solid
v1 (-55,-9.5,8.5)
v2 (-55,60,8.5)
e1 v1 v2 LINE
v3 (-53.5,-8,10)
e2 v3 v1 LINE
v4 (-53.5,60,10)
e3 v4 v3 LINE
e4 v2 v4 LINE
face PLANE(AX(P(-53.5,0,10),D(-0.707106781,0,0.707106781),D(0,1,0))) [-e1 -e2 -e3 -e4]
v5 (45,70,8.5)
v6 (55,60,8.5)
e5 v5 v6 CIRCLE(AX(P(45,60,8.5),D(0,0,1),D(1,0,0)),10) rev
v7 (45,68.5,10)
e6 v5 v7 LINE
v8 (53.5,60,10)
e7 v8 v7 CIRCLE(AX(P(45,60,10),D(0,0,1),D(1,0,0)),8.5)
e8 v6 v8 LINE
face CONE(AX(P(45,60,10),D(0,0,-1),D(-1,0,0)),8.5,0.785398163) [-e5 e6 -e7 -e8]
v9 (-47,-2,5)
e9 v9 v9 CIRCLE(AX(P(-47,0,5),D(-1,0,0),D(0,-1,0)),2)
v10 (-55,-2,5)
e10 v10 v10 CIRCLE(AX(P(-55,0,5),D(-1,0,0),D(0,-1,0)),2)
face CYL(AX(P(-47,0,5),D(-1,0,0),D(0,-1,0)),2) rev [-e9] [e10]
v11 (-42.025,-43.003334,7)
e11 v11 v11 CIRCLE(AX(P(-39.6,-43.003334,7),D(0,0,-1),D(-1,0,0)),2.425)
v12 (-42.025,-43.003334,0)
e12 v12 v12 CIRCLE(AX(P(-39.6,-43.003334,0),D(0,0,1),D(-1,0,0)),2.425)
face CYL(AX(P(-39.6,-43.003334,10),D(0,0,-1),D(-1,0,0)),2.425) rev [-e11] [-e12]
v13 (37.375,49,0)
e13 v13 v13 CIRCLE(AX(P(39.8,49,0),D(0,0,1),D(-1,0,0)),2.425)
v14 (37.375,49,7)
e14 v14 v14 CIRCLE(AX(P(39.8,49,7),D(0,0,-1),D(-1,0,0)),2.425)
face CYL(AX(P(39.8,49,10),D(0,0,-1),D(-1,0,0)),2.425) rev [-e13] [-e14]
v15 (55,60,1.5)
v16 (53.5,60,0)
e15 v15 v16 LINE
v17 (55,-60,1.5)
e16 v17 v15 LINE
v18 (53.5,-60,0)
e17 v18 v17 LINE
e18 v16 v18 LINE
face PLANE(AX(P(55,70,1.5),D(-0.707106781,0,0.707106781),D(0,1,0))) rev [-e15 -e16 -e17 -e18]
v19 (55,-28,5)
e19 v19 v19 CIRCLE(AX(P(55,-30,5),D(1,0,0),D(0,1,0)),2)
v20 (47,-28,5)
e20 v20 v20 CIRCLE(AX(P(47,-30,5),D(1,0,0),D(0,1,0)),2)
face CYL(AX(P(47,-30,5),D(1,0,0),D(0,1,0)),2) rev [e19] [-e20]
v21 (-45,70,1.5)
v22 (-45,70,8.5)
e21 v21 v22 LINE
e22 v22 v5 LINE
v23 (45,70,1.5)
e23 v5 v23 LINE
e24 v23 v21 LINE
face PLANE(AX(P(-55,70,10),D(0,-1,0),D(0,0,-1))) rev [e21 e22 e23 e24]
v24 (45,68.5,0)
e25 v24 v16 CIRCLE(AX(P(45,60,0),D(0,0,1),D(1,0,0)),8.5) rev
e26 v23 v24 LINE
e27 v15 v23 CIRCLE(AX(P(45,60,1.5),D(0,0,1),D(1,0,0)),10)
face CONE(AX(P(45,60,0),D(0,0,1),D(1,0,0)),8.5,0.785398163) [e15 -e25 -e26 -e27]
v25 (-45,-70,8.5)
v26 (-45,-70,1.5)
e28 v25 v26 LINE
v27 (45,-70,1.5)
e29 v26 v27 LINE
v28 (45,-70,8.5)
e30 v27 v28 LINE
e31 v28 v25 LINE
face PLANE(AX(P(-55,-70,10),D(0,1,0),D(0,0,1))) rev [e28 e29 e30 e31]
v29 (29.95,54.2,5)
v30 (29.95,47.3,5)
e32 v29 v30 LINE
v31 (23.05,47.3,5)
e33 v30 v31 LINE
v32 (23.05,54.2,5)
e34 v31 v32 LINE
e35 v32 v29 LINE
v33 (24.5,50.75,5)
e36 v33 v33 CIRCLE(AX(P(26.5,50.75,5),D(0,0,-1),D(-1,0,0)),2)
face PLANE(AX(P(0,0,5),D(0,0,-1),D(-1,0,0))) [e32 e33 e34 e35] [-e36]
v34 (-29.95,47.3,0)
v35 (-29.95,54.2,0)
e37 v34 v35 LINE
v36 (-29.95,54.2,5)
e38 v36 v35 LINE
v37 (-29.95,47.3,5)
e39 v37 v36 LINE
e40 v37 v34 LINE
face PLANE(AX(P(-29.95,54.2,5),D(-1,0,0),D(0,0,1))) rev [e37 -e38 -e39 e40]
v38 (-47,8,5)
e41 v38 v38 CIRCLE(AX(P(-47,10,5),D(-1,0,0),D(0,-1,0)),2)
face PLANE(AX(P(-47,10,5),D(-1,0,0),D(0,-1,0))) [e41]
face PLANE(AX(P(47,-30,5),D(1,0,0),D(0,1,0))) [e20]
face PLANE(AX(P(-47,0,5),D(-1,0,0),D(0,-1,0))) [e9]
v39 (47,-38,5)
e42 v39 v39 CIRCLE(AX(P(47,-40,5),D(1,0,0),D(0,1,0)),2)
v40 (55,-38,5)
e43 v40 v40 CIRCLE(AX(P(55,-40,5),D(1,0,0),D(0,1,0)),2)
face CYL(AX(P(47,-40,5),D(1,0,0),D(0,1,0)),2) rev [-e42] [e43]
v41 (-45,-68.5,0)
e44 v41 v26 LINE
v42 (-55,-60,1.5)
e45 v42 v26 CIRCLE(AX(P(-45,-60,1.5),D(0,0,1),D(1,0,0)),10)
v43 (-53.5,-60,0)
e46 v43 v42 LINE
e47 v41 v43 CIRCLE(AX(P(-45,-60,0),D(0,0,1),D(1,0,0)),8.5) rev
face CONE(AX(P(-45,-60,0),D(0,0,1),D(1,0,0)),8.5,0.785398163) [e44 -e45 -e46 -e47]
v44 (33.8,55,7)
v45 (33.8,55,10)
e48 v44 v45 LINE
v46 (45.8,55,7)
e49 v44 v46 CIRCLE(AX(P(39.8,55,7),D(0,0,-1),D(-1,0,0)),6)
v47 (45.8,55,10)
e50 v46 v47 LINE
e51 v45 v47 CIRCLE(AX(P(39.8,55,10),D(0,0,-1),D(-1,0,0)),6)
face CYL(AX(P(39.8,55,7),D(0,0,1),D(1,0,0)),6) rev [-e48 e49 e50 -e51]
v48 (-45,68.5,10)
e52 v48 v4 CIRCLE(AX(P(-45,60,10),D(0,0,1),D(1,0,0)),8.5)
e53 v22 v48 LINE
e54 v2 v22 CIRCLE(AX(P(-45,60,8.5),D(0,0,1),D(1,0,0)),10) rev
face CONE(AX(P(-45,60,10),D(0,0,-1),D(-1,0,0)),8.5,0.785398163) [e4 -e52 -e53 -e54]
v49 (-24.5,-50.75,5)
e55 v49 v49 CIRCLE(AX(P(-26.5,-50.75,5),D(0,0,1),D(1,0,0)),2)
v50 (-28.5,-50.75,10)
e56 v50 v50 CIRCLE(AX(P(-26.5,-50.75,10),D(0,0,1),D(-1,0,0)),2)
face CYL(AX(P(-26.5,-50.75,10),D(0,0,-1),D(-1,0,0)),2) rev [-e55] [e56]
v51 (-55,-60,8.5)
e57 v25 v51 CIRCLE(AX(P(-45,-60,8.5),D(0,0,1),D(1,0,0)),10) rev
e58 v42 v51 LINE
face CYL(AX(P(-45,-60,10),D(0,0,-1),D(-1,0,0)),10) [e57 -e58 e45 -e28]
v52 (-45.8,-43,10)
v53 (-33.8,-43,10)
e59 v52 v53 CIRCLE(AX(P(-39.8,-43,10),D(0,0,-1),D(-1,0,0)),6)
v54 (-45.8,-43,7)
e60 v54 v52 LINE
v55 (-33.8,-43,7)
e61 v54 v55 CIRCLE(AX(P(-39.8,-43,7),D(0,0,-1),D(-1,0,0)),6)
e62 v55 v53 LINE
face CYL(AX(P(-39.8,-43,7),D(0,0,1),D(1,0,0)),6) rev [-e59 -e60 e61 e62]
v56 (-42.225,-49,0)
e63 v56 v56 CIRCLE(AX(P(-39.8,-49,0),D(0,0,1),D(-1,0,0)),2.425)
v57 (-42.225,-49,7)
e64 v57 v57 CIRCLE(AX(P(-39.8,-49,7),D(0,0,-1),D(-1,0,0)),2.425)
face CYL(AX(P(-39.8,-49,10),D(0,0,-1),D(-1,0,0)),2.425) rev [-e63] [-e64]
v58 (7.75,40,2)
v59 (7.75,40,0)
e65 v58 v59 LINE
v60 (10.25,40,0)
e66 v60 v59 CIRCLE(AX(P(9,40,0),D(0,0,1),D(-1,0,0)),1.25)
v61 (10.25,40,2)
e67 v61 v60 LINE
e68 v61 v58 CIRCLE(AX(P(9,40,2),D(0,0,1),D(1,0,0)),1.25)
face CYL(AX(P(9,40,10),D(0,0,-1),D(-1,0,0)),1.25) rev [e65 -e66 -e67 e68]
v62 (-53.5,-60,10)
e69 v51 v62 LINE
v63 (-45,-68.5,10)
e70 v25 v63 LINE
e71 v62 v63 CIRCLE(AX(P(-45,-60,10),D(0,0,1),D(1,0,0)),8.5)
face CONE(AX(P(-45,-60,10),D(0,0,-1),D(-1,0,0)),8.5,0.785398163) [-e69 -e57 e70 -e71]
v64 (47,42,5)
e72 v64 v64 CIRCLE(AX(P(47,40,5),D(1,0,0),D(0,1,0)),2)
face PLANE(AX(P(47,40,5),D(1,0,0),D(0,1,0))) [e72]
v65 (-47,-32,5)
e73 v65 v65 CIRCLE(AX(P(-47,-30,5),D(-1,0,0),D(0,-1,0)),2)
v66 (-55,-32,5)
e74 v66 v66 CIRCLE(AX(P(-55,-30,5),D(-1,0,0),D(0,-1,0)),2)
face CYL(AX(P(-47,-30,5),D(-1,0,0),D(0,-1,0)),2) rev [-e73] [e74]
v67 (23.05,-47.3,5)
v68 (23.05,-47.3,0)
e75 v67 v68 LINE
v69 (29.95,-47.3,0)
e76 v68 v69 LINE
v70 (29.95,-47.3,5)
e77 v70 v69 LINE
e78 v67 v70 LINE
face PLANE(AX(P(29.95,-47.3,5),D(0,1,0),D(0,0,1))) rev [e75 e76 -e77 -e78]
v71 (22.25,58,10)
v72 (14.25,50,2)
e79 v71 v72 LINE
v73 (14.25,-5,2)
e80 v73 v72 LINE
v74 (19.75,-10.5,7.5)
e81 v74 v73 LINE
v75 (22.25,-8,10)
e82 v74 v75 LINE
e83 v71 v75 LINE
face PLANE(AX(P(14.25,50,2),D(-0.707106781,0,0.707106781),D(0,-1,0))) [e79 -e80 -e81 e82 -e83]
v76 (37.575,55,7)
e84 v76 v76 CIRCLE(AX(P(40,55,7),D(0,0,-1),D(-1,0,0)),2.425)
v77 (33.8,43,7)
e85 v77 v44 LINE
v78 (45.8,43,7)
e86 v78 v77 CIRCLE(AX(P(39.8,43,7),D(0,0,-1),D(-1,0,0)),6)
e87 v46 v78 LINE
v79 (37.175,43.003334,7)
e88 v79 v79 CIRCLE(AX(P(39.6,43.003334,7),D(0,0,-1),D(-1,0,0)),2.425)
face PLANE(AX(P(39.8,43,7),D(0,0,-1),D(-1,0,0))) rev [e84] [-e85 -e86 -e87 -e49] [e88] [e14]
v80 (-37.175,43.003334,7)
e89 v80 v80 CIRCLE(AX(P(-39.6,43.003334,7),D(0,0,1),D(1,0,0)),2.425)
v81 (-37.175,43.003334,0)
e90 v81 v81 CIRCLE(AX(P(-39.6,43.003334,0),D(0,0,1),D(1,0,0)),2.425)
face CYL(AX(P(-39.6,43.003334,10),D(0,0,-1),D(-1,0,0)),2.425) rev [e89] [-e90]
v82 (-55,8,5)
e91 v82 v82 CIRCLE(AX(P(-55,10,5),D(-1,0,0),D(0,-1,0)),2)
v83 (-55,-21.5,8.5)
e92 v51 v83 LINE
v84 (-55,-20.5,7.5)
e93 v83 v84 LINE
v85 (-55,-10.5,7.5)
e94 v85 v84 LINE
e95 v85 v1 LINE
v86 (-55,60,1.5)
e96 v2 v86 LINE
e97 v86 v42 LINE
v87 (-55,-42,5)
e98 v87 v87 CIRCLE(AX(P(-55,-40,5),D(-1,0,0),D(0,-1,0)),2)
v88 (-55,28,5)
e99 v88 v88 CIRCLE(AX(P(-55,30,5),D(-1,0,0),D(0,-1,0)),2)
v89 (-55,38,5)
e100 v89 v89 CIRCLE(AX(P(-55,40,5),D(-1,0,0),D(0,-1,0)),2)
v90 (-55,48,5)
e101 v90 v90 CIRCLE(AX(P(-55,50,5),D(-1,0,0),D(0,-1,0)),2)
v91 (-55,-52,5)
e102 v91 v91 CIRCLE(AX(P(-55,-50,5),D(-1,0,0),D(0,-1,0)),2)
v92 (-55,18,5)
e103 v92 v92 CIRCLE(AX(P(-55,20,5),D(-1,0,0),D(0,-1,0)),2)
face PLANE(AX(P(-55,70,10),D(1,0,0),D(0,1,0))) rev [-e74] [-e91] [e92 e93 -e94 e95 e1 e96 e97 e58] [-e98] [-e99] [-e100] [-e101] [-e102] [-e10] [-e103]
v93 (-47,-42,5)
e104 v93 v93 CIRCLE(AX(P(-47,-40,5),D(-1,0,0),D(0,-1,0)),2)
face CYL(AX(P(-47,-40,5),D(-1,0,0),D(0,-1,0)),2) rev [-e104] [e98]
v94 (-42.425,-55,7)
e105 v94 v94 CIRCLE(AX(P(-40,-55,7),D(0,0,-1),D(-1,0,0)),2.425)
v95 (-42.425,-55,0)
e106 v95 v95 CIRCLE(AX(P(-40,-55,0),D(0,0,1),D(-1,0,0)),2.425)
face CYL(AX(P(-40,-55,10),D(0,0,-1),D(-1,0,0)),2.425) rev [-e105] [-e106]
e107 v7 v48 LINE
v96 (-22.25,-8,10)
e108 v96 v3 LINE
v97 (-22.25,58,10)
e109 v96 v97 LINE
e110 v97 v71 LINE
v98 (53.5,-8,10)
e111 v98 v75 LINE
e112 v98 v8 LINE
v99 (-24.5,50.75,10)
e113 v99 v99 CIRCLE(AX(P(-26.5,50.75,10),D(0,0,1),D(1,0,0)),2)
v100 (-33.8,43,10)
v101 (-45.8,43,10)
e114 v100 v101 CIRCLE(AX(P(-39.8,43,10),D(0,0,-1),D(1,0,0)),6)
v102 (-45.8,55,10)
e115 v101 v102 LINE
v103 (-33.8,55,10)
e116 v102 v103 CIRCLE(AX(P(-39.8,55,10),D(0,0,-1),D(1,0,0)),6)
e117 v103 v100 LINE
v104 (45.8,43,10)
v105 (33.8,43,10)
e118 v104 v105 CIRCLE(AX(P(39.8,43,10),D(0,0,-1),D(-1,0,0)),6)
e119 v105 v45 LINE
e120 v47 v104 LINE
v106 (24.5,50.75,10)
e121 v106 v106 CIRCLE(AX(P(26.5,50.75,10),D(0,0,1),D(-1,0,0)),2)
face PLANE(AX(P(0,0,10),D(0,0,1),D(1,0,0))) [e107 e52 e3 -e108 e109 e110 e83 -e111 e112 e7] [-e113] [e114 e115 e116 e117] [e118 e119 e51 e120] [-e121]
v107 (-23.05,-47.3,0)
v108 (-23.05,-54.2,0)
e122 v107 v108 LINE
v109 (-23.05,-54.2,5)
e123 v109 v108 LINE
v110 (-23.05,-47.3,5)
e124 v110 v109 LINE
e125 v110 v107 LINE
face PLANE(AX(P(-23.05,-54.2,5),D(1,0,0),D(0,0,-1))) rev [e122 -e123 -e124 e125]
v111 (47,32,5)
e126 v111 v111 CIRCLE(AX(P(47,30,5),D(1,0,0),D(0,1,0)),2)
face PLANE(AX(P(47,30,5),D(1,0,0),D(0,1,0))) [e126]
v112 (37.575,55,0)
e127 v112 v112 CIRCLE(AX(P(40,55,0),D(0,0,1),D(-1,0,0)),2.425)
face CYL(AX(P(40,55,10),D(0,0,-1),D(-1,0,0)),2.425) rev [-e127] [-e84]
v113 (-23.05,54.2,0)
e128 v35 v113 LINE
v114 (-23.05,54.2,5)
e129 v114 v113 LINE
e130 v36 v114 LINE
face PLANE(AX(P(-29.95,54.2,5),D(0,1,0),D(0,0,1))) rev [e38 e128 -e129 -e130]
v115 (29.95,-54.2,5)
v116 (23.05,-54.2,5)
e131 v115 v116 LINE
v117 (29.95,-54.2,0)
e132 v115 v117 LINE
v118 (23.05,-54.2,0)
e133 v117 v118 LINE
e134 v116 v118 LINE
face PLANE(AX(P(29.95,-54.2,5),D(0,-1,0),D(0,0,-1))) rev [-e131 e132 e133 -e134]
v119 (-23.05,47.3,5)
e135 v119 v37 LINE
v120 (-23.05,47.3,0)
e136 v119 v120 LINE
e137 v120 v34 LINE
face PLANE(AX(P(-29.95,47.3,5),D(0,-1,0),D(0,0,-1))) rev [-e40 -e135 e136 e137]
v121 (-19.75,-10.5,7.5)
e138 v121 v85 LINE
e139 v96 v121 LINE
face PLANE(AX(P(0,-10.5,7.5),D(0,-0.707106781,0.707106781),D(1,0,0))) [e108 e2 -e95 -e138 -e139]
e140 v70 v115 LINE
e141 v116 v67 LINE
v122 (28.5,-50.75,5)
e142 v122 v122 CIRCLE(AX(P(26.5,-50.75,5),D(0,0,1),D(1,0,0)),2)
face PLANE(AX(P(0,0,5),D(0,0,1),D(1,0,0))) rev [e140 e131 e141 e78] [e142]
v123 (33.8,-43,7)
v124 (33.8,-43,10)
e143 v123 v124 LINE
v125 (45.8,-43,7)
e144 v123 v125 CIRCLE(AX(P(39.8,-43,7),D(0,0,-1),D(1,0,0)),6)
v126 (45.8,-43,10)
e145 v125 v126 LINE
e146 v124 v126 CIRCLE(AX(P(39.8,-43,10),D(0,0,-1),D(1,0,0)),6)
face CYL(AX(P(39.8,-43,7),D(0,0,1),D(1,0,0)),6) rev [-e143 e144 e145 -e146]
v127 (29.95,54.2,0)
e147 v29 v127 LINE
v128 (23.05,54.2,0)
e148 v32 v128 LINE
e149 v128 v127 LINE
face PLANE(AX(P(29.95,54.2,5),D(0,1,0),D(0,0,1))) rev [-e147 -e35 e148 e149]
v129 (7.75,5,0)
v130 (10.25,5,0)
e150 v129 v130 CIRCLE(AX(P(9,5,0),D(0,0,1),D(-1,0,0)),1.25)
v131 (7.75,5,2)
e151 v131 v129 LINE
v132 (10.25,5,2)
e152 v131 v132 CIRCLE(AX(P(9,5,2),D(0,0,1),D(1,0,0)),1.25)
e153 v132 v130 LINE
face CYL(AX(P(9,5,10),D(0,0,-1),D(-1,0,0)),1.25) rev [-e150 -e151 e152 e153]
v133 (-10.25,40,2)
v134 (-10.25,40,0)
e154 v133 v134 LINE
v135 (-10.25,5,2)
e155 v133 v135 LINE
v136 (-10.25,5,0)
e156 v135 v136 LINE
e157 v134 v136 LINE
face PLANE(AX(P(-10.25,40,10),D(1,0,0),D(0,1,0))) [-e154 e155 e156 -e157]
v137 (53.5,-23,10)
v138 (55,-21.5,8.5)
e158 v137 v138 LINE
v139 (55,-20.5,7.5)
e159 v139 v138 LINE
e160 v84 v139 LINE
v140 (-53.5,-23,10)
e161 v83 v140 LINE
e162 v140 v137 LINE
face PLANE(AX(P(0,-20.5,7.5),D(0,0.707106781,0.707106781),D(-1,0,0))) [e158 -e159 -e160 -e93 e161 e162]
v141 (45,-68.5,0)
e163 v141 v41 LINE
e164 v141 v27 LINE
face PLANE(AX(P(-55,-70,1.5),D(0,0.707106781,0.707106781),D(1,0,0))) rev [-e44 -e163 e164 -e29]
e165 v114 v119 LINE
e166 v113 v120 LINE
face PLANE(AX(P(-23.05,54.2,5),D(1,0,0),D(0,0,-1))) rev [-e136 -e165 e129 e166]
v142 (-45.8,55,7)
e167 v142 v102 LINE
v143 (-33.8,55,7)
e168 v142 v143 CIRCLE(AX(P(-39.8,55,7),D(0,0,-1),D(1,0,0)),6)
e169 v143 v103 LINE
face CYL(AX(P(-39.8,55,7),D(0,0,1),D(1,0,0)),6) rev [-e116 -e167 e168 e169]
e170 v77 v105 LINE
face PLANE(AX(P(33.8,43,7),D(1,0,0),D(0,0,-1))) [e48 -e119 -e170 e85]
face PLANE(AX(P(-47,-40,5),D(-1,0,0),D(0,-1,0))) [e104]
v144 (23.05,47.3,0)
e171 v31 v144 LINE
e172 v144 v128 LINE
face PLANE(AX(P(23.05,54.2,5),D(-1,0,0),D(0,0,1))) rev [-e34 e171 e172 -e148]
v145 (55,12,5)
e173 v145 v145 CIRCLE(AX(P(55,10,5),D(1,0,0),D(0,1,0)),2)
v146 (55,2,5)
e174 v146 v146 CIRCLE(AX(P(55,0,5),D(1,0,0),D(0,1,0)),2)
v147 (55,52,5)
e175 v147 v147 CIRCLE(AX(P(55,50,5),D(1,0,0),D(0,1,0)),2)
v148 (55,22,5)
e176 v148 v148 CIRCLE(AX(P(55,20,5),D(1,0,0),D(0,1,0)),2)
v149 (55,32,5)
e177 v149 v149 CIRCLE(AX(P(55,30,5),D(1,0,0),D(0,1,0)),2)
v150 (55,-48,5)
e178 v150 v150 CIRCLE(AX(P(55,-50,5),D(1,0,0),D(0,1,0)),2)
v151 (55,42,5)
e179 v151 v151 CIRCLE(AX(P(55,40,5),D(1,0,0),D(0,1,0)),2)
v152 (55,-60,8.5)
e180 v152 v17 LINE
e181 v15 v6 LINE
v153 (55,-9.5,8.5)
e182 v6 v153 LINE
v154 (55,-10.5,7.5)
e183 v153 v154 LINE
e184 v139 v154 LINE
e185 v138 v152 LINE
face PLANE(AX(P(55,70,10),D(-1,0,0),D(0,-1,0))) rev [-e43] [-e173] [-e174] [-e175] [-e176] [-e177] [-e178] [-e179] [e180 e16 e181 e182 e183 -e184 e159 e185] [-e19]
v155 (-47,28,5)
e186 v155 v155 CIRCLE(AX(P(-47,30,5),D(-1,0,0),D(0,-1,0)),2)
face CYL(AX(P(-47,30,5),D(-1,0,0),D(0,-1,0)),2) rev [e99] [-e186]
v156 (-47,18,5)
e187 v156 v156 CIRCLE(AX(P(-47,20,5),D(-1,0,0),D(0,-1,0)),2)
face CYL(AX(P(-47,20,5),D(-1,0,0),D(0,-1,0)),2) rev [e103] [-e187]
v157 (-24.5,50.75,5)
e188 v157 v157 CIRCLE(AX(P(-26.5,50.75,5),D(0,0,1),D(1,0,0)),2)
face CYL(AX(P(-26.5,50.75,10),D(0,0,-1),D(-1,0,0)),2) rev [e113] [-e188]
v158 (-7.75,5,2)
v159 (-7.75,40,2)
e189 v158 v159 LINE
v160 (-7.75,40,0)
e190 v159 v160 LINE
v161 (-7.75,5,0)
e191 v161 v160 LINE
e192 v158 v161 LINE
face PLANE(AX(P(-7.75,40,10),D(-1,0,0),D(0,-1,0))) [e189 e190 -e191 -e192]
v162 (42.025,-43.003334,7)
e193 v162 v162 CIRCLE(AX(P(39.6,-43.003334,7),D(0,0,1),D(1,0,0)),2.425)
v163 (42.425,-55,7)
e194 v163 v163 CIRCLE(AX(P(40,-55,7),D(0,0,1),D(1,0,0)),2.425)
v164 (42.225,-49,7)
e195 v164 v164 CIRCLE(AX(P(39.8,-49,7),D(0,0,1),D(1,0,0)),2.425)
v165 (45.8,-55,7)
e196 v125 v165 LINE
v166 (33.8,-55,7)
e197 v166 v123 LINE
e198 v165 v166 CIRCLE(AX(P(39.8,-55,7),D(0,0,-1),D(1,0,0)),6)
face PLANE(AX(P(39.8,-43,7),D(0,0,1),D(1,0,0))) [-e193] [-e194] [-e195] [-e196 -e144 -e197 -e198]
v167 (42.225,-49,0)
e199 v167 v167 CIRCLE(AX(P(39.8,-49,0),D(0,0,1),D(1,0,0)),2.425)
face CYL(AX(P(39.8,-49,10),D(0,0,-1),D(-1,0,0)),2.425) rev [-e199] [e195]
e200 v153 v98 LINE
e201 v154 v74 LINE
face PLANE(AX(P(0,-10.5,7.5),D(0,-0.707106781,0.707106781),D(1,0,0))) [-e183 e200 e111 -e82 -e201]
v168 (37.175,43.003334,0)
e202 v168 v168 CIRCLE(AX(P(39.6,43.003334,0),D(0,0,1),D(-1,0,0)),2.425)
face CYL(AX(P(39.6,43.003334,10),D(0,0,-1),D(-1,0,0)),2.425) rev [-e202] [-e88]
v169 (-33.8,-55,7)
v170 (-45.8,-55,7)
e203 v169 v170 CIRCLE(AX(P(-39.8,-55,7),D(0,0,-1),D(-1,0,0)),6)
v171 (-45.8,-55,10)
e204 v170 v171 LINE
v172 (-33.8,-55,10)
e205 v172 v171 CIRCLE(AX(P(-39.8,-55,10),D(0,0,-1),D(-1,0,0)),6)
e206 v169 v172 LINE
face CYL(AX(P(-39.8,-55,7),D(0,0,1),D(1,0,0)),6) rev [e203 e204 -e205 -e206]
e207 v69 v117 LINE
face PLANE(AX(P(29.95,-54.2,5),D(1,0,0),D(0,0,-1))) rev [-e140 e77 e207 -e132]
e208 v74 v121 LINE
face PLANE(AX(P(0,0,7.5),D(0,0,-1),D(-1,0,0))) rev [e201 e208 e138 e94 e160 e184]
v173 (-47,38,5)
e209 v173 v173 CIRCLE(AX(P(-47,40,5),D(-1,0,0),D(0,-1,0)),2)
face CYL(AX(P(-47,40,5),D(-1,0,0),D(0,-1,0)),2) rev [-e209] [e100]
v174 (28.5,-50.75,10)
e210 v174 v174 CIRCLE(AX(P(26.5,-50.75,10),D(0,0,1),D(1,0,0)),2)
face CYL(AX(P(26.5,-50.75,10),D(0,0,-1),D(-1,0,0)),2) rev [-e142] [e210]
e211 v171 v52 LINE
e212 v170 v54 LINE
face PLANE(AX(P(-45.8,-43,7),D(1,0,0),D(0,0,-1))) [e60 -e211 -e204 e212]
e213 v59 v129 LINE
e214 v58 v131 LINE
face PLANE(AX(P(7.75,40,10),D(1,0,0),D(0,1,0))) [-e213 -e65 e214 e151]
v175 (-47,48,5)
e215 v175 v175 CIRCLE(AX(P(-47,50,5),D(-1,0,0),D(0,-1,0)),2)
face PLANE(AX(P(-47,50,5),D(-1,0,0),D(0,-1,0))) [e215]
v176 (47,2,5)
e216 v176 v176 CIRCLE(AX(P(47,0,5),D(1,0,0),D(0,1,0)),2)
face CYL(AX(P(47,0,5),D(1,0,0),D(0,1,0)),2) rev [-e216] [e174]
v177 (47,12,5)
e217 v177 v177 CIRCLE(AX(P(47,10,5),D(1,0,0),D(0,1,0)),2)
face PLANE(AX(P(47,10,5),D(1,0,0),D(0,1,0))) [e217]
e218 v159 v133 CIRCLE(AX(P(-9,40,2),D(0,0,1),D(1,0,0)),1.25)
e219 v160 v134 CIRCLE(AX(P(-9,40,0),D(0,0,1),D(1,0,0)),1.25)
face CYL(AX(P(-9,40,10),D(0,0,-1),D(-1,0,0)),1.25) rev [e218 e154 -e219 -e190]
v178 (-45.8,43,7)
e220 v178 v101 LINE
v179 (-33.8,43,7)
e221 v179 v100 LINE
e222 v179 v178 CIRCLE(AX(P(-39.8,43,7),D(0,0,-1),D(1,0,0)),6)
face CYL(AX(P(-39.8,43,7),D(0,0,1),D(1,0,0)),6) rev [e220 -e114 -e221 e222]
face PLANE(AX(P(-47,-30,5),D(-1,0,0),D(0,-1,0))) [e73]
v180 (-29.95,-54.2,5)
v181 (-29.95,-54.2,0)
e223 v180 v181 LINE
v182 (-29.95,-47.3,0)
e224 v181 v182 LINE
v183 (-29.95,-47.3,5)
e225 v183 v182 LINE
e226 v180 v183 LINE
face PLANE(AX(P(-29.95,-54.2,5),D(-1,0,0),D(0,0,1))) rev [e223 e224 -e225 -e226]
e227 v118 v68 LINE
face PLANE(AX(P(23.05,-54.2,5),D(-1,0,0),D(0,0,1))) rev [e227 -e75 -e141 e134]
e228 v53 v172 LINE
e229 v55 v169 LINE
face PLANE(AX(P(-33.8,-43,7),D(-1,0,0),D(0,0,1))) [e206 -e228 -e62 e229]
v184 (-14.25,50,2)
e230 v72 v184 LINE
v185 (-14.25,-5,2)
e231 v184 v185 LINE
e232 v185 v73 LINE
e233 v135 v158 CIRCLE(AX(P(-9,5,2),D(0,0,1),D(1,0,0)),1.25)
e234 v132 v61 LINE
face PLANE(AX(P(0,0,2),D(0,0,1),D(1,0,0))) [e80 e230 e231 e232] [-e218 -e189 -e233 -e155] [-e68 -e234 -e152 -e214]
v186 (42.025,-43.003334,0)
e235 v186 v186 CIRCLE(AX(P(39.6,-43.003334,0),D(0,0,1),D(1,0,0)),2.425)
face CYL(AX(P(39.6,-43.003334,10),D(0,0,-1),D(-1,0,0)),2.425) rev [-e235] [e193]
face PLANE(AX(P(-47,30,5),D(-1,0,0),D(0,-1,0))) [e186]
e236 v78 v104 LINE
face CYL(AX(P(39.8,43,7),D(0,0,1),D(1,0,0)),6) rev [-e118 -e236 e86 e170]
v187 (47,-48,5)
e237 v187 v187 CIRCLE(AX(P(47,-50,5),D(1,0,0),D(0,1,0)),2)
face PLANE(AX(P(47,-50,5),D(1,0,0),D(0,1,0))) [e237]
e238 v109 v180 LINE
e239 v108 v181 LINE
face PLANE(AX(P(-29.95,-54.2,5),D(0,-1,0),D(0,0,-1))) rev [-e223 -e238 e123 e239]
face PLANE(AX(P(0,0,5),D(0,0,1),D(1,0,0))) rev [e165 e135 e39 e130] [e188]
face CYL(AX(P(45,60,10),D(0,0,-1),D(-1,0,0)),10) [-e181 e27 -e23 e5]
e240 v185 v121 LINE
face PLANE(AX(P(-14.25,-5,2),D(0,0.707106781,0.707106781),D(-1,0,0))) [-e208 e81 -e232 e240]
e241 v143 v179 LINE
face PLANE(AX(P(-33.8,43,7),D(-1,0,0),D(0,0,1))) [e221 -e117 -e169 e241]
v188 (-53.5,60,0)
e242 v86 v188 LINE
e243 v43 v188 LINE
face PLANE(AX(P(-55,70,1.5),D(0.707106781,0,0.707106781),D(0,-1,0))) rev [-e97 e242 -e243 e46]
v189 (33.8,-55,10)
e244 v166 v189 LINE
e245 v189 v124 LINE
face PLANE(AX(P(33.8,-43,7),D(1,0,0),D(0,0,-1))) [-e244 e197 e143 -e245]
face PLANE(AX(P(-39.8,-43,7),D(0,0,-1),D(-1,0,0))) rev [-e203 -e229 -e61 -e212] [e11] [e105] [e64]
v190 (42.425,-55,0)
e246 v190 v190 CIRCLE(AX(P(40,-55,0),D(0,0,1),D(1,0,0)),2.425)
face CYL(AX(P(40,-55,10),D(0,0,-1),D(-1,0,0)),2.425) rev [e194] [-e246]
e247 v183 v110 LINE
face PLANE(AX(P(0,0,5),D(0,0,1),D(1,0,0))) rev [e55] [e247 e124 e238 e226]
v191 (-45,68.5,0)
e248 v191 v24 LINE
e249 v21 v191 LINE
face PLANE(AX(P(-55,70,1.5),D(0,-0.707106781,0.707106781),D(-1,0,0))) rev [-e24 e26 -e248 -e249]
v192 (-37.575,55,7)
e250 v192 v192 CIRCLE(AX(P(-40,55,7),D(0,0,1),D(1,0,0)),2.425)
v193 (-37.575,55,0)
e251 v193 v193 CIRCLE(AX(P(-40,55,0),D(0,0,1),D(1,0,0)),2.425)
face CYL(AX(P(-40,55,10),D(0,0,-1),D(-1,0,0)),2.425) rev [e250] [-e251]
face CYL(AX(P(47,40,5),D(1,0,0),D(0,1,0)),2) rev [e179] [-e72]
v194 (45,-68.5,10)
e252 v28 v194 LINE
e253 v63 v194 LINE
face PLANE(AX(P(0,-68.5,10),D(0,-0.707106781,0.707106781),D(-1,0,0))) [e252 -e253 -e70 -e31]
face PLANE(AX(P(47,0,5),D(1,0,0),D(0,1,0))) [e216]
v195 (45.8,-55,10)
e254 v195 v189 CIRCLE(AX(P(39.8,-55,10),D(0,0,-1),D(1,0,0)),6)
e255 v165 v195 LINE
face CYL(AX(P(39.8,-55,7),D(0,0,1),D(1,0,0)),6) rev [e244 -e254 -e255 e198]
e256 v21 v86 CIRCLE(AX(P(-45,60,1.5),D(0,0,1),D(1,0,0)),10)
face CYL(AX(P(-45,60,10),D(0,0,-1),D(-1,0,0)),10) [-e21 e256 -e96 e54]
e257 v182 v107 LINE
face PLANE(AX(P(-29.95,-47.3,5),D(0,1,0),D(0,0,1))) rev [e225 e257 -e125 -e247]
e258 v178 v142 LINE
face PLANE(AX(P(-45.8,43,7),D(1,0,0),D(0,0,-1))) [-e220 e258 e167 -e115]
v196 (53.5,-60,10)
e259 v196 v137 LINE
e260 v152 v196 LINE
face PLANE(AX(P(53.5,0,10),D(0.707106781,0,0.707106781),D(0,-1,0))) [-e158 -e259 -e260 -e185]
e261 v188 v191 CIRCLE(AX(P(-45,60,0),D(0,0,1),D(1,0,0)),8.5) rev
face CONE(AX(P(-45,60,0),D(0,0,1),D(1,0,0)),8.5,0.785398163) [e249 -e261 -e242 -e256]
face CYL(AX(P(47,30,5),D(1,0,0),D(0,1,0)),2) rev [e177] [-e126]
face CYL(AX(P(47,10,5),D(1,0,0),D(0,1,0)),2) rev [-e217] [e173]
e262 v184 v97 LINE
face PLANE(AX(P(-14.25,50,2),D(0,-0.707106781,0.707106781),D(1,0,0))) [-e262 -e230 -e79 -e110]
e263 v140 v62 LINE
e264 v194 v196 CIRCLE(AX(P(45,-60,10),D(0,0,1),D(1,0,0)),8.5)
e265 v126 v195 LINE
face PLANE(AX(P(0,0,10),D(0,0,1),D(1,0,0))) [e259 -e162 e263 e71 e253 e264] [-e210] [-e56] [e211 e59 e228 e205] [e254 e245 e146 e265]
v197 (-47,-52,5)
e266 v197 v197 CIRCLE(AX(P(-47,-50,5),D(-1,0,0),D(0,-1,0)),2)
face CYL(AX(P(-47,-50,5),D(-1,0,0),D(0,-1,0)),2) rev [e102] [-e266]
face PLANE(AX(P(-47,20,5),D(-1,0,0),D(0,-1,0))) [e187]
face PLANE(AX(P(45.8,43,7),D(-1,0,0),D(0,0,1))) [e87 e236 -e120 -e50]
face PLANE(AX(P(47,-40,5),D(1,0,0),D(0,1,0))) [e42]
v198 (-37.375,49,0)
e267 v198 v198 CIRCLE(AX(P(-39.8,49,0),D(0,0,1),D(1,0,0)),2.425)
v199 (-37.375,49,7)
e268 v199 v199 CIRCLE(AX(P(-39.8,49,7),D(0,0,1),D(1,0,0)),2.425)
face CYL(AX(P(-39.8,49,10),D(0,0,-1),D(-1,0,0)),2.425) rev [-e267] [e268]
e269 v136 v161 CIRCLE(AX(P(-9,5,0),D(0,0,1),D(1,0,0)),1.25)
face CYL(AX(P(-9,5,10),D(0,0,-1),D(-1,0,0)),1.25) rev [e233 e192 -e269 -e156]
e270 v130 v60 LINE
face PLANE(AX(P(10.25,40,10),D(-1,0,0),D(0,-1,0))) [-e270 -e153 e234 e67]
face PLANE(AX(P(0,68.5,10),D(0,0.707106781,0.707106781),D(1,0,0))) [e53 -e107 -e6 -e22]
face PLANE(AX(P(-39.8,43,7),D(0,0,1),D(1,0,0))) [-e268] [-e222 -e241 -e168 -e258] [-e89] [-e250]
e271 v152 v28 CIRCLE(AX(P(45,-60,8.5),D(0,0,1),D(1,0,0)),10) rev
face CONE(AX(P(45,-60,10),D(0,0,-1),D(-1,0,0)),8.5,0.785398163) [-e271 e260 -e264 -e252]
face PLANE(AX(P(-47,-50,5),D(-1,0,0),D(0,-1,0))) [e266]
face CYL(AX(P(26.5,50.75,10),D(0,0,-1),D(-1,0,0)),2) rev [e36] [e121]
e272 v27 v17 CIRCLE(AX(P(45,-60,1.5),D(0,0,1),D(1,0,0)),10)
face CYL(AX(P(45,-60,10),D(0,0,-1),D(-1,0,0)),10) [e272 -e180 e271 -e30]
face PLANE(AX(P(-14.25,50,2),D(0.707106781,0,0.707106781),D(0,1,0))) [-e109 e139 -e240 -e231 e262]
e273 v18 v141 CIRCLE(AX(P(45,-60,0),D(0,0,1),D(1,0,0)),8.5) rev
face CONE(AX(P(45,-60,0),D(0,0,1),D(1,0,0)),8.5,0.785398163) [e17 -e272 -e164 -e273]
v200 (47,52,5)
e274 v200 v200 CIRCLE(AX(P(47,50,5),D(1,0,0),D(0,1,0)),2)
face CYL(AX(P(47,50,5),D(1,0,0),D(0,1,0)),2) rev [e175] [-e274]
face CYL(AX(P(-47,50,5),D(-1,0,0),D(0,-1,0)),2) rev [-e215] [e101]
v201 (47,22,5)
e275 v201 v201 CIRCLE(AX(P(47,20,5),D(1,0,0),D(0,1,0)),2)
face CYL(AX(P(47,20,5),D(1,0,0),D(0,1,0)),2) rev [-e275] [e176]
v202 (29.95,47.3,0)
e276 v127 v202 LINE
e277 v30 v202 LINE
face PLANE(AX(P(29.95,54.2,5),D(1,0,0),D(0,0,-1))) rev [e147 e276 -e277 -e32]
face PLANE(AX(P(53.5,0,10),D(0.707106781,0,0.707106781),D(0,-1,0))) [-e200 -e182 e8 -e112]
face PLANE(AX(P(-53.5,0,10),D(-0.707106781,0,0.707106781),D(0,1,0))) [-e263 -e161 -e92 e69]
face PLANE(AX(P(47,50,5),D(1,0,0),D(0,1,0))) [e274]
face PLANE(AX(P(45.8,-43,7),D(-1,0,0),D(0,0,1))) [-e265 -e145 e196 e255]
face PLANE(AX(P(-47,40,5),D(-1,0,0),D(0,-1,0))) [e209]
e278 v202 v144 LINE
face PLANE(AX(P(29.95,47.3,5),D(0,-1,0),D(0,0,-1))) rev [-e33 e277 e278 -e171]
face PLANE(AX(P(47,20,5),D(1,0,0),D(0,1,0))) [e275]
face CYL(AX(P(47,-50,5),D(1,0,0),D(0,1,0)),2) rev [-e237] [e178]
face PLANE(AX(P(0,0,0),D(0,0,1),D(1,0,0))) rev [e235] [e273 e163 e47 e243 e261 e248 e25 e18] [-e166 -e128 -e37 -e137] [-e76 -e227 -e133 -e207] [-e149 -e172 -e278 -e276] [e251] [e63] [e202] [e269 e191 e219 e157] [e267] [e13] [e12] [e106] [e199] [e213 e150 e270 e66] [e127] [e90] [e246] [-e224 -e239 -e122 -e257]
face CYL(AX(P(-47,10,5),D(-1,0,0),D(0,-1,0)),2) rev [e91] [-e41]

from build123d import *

# Parameters (mm, degrees)
SKETCH1_W           = 110
SKETCH1_H           = 140
SKETCH1_R           = 2
SKETCH1_R_2         = 2.425
BOSS_EXTRUDE1_DEPTH = 10
FILLET1_R           = 10
SKETCH3_W           = 28.5
SKETCH3_H           = 55
CUT_EXTRUDE1_DEPTH  = 8
CHAMFER1_SIZE       = 8
SKETCH5_R           = 2
CUT_EXTRUDE3_DEPTH  = 8
CUT_EXTRUDE4_START  = -8
SKETCH6_R           = 2
CUT_EXTRUDE4_DEPTH  = 8
SKETCH7_W           = 110
SKETCH7_H           = 15
CUT_EXTRUDE7_DEPTH  = 2.5
CHAMFER3_SIZE       = 2.5
CHAMFER4_SIZE       = 1.5
CUT_EXTRUDE8_DEPTH  = 3
BOSS_EXTRUDE3_DEPTH = 10
SKETCH10_W          = 6.9
SKETCH10_H          = 6.9
CUT_EXTRUDE9_DEPTH  = 5
BOSS_EXTRUDE4_DEPTH = 10


with BuildPart() as part:
    # Sketch1 → Boss-Extrude1 (new body)
    with BuildSketch(Plane.XY):
        Rectangle(SKETCH1_W, SKETCH1_H)
        with Locations((-26.5, 50.75)):
            Circle(SKETCH1_R, mode=Mode.SUBTRACT)
        with Locations(Location((26.5, 50.75, 0), (0, 0, 180))):
            Circle(SKETCH1_R, mode=Mode.SUBTRACT)
        with Locations((26.5, -50.75)):
            Circle(SKETCH1_R, mode=Mode.SUBTRACT)
        with Locations(Location((-26.5, -50.75, 0), (0, 0, 180))):
            Circle(SKETCH1_R, mode=Mode.SUBTRACT)
        with Locations((-40, 55)):
            Circle(SKETCH1_R_2, mode=Mode.SUBTRACT)
        with Locations(Location((40, 55, 0), (0, 0, 180))):
            Circle(SKETCH1_R_2, mode=Mode.SUBTRACT)
        with Locations((40, -55)):
            Circle(SKETCH1_R_2, mode=Mode.SUBTRACT)
        with Locations(Location((-40, -55, 0), (0, 0, 180))):
            Circle(SKETCH1_R_2, mode=Mode.SUBTRACT)
        with Locations((-39.8, 49)):
            Circle(SKETCH1_R_2, mode=Mode.SUBTRACT)
        with Locations(Location((39.8, 49, 0), (0, 0, 180))):
            Circle(SKETCH1_R_2, mode=Mode.SUBTRACT)
        with Locations((39.8, -49)):
            Circle(SKETCH1_R_2, mode=Mode.SUBTRACT)
        with Locations(Location((-39.8, -49, 0), (0, 0, 180))):
            Circle(SKETCH1_R_2, mode=Mode.SUBTRACT)
        with Locations((-39.6, 43.00333426)):
            Circle(SKETCH1_R_2, mode=Mode.SUBTRACT)
        with Locations(Location((39.6, 43.00333426, 0), (0, 0, 180))):
            Circle(SKETCH1_R_2, mode=Mode.SUBTRACT)
        with Locations((39.6, -43.00333426)):
            Circle(SKETCH1_R_2, mode=Mode.SUBTRACT)
        with Locations(Location((-39.6, -43.00333426, 0), (0, 0, 180))):
            Circle(SKETCH1_R_2, mode=Mode.SUBTRACT)
        with BuildLine():
            Line((-7.75, 40), (-7.75, 5))
            ThreePointArc((-7.75, 5), (-9, 3.75), (-10.25, 5))
            Line((-10.25, 5), (-10.25, 40))
            ThreePointArc((-10.25, 40), (-9, 41.25), (-7.75, 40))
        make_face(mode=Mode.SUBTRACT)
        with BuildLine():
            Line((7.75, 40), (7.75, 5))
            ThreePointArc((7.75, 5), (9, 3.75), (10.25, 5))
            Line((10.25, 5), (10.25, 40))
            ThreePointArc((10.25, 40), (9, 41.25), (7.75, 40))
        make_face(mode=Mode.SUBTRACT)
    extrude(amount=BOSS_EXTRUDE1_DEPTH)

    # Fillet1
    fillet1_edges = [part.edges().sort_by_distance(p)[0] for p in [
        (55, -70, 5),
        (-55, -70, 5),
        (-55, 70, 5),
        (55, 70, 5),
    ]]
    fillet(fillet1_edges, radius=FILLET1_R)

    # Sketch3 → Cut-Extrude1 (cut)
    with BuildSketch(Plane.XY.offset(10)):
        with Locations((0, 22.5)):
            Rectangle(SKETCH3_W, SKETCH3_H)
    extrude(amount=-CUT_EXTRUDE1_DEPTH, mode=Mode.SUBTRACT)

    # Chamfer1
    chamfer1_edges = [part.edges().sort_by_distance(p)[0] for p in [
        (0, -5, 10),
        (14.25, 22.5, 10),
        (0, 50, 10),
        (-14.25, 22.5, 10),
    ]]
    chamfer(chamfer1_edges, length=CHAMFER1_SIZE - 0.0001)  # a hair under: the kernel refuses the full size

    # Sketch5 → Cut-Extrude3 (cut)
    with BuildSketch(Plane.ZY.offset(55)):
        with Locations(Location((5, 50, 0), (0, 0, 270))):
            Circle(SKETCH5_R)
        with Locations(Location((5, 40, 0), (0, 0, 270))):
            Circle(SKETCH5_R)
        with Locations(Location((5, 30, 0), (0, 0, 270))):
            Circle(SKETCH5_R)
        with Locations(Location((5, 20, 0), (0, 0, 270))):
            Circle(SKETCH5_R)
        with Locations(Location((5, 10, 0), (0, 0, 270))):
            Circle(SKETCH5_R)
        with Locations(Location((5, 0, 0), (0, 0, 270))):
            Circle(SKETCH5_R)
        with Locations(Location((5, -10, 0), (0, 0, 270))):
            Circle(SKETCH5_R)
        with Locations(Location((5, -20, 0), (0, 0, 270))):
            Circle(SKETCH5_R)
        with Locations(Location((5, -30, 0), (0, 0, 270))):
            Circle(SKETCH5_R)
        with Locations(Location((5, -40, 0), (0, 0, 270))):
            Circle(SKETCH5_R)
        with Locations(Location((5, -50, 0), (0, 0, 270))):
            Circle(SKETCH5_R)
    extrude(amount=-CUT_EXTRUDE3_DEPTH, mode=Mode.SUBTRACT)

    # Sketch6 → Cut-Extrude4 (cut)
    with BuildSketch(Plane(origin=(55, 0, 0), x_dir=(0, 0, -1), z_dir=(1, 0, 0)).offset(CUT_EXTRUDE4_START)):
        with Locations(Location((-5, 50, 0), (0, 0, 270))):
            Circle(SKETCH6_R)
        with Locations(Location((-5, 40, 0), (0, 0, 270))):
            Circle(SKETCH6_R)
        with Locations(Location((-5, 30, 0), (0, 0, 270))):
            Circle(SKETCH6_R)
        with Locations(Location((-5, 20, 0), (0, 0, 270))):
            Circle(SKETCH6_R)
        with Locations(Location((-5, 10, 0), (0, 0, 270))):
            Circle(SKETCH6_R)
        with Locations(Location((-5, 0, 0), (0, 0, 270))):
            Circle(SKETCH6_R)
        with Locations(Location((-5, -10, 0), (0, 0, 270))):
            Circle(SKETCH6_R)
        with Locations(Location((-5, -20, 0), (0, 0, 270))):
            Circle(SKETCH6_R)
        with Locations(Location((-5, -30, 0), (0, 0, 270))):
            Circle(SKETCH6_R)
        with Locations(Location((-5, -40, 0), (0, 0, 270))):
            Circle(SKETCH6_R)
        with Locations(Location((-5, -50, 0), (0, 0, 270))):
            Circle(SKETCH6_R)
    extrude(amount=CUT_EXTRUDE4_DEPTH, mode=Mode.SUBTRACT)

    # Sketch7 → Cut-Extrude7 (cut)
    with BuildSketch(Plane.XY.offset(10)):
        with Locations((0, -15.5)):
            Rectangle(SKETCH7_W, SKETCH7_H)
    extrude(amount=-CUT_EXTRUDE7_DEPTH, mode=Mode.SUBTRACT)

    # Chamfer3
    chamfer3_edges = [part.edges().sort_by_distance(p)[0] for p in [
        (0, -23, 7.5),
        (-37.37495, -8, 7.5),
        (37.37495, -8, 7.5),
    ]]
    chamfer(chamfer3_edges, length=CHAMFER3_SIZE - 0.0001)  # a hair under: the kernel refuses the full size

    # Chamfer4
    chamfer4_edges = [part.edges().sort_by_distance(p)[0] for p in [
        (0, -70, 0),
        (0, -70, 10),
        (55, 0, 0),
        (-55, 0, 0),
        (0, 70, 0),
        (52.071067812, 67.071067812, 0),
        (-52.071067812, 67.071067812, 0),
        (52.071067812, -67.071067812, 0),
        (-52.071067812, -67.071067812, 0),
        (-55, 26, 10),
        (55, -41.5, 10),
        (0, 70, 10),
        (52.071067812, 67.071067812, 10),
        (-52.071067812, 67.071067812, 10),
        (52.071067812, -67.071067812, 10),
        (-52.071067812, -67.071067812, 10),
        (-55, -41.5, 10),
        (55, 26, 10),
    ]]
    chamfer(chamfer4_edges, length=CHAMFER4_SIZE)

    # Sketch8 → Cut-Extrude8 (cut)
    with BuildSketch(Plane(origin=(0, 0, 10), x_dir=(-1, 0, 0), z_dir=(0, 0, -1))):
        with BuildLine():
            Line((-45.8, 43), (-45.8, 55))
            ThreePointArc((-45.8, 55), (-39.8, 61), (-33.8, 55))
            Line((-33.8, 55), (-33.8, 43))
            ThreePointArc((-33.8, 43), (-39.8, 37), (-45.8, 43))
        make_face()
        with BuildLine():
            Line((45.8, 43), (45.8, 55))
            ThreePointArc((45.8, 55), (39.8, 61), (33.8, 55))
            Line((33.8, 55), (33.8, 43))
            ThreePointArc((33.8, 43), (39.8, 37), (45.8, 43))
        make_face()
        with BuildLine():
            Line((45.8, -43), (45.8, -55))
            ThreePointArc((45.8, -55), (39.8, -61), (33.8, -55))
            Line((33.8, -55), (33.8, -43))
            ThreePointArc((33.8, -43), (39.8, -37), (45.8, -43))
        make_face()
        with BuildLine():
            Line((-45.8, -43), (-45.8, -55))
            ThreePointArc((-45.8, -55), (-39.8, -61), (-33.8, -55))
            Line((-33.8, -55), (-33.8, -43))
            ThreePointArc((-33.8, -43), (-39.8, -37), (-45.8, -43))
        make_face()
    extrude(amount=CUT_EXTRUDE8_DEPTH, mode=Mode.SUBTRACT)

    # Sketch9 → Boss-Extrude3 (add)
    with BuildSketch(Plane(origin=(55, 0, 0), x_dir=(0, 0, -1), z_dir=(1, 0, 0))):
        Polygon((-7.479483029, -9.130730638), (-5.687930895, -6.827306465), (-2.453830288, -7.571847612), (-2.453830288, -22.439403639), (-6.432472041, -22.439403639), (-7.150561873, -20.576942606), (-7.150561873, -10.503478378), align=None)
    extrude(amount=-BOSS_EXTRUDE3_DEPTH)

    # Sketch10 → Cut-Extrude9 (cut)
    with BuildSketch(Plane(origin=(0, 0, 0), x_dir=(-1, 0, 0), z_dir=(0, 0, -1))):
        with Locations((-26.5, 50.75)):
            Rectangle(SKETCH10_W, SKETCH10_H)
        with Locations((26.5, 50.75)):
            Rectangle(SKETCH10_W, SKETCH10_H)
        with Locations((26.5, -50.75)):
            Rectangle(SKETCH10_W, SKETCH10_H)
        with Locations((-26.5, -50.75)):
            Rectangle(SKETCH10_W, SKETCH10_H)
    extrude(amount=-CUT_EXTRUDE9_DEPTH, mode=Mode.SUBTRACT)

    # Sketch11 → Boss-Extrude4 (add)
    with BuildSketch(Plane.ZY.offset(55)):
        Polygon((2.460121708, -8.614116327), (4.352652236, -6.895389623), (7.133513419, -6.895389623), (7.925286395, -8.961723975), (7.133513419, -10.622516071), (7.133513419, -21.398353157), (5, -22.866029893), (2.711171676, -22.614979925), (2.267006348, -15.044857814), align=None)
    extrude(amount=-BOSS_EXTRUDE4_DEPTH)


solid = part.part
